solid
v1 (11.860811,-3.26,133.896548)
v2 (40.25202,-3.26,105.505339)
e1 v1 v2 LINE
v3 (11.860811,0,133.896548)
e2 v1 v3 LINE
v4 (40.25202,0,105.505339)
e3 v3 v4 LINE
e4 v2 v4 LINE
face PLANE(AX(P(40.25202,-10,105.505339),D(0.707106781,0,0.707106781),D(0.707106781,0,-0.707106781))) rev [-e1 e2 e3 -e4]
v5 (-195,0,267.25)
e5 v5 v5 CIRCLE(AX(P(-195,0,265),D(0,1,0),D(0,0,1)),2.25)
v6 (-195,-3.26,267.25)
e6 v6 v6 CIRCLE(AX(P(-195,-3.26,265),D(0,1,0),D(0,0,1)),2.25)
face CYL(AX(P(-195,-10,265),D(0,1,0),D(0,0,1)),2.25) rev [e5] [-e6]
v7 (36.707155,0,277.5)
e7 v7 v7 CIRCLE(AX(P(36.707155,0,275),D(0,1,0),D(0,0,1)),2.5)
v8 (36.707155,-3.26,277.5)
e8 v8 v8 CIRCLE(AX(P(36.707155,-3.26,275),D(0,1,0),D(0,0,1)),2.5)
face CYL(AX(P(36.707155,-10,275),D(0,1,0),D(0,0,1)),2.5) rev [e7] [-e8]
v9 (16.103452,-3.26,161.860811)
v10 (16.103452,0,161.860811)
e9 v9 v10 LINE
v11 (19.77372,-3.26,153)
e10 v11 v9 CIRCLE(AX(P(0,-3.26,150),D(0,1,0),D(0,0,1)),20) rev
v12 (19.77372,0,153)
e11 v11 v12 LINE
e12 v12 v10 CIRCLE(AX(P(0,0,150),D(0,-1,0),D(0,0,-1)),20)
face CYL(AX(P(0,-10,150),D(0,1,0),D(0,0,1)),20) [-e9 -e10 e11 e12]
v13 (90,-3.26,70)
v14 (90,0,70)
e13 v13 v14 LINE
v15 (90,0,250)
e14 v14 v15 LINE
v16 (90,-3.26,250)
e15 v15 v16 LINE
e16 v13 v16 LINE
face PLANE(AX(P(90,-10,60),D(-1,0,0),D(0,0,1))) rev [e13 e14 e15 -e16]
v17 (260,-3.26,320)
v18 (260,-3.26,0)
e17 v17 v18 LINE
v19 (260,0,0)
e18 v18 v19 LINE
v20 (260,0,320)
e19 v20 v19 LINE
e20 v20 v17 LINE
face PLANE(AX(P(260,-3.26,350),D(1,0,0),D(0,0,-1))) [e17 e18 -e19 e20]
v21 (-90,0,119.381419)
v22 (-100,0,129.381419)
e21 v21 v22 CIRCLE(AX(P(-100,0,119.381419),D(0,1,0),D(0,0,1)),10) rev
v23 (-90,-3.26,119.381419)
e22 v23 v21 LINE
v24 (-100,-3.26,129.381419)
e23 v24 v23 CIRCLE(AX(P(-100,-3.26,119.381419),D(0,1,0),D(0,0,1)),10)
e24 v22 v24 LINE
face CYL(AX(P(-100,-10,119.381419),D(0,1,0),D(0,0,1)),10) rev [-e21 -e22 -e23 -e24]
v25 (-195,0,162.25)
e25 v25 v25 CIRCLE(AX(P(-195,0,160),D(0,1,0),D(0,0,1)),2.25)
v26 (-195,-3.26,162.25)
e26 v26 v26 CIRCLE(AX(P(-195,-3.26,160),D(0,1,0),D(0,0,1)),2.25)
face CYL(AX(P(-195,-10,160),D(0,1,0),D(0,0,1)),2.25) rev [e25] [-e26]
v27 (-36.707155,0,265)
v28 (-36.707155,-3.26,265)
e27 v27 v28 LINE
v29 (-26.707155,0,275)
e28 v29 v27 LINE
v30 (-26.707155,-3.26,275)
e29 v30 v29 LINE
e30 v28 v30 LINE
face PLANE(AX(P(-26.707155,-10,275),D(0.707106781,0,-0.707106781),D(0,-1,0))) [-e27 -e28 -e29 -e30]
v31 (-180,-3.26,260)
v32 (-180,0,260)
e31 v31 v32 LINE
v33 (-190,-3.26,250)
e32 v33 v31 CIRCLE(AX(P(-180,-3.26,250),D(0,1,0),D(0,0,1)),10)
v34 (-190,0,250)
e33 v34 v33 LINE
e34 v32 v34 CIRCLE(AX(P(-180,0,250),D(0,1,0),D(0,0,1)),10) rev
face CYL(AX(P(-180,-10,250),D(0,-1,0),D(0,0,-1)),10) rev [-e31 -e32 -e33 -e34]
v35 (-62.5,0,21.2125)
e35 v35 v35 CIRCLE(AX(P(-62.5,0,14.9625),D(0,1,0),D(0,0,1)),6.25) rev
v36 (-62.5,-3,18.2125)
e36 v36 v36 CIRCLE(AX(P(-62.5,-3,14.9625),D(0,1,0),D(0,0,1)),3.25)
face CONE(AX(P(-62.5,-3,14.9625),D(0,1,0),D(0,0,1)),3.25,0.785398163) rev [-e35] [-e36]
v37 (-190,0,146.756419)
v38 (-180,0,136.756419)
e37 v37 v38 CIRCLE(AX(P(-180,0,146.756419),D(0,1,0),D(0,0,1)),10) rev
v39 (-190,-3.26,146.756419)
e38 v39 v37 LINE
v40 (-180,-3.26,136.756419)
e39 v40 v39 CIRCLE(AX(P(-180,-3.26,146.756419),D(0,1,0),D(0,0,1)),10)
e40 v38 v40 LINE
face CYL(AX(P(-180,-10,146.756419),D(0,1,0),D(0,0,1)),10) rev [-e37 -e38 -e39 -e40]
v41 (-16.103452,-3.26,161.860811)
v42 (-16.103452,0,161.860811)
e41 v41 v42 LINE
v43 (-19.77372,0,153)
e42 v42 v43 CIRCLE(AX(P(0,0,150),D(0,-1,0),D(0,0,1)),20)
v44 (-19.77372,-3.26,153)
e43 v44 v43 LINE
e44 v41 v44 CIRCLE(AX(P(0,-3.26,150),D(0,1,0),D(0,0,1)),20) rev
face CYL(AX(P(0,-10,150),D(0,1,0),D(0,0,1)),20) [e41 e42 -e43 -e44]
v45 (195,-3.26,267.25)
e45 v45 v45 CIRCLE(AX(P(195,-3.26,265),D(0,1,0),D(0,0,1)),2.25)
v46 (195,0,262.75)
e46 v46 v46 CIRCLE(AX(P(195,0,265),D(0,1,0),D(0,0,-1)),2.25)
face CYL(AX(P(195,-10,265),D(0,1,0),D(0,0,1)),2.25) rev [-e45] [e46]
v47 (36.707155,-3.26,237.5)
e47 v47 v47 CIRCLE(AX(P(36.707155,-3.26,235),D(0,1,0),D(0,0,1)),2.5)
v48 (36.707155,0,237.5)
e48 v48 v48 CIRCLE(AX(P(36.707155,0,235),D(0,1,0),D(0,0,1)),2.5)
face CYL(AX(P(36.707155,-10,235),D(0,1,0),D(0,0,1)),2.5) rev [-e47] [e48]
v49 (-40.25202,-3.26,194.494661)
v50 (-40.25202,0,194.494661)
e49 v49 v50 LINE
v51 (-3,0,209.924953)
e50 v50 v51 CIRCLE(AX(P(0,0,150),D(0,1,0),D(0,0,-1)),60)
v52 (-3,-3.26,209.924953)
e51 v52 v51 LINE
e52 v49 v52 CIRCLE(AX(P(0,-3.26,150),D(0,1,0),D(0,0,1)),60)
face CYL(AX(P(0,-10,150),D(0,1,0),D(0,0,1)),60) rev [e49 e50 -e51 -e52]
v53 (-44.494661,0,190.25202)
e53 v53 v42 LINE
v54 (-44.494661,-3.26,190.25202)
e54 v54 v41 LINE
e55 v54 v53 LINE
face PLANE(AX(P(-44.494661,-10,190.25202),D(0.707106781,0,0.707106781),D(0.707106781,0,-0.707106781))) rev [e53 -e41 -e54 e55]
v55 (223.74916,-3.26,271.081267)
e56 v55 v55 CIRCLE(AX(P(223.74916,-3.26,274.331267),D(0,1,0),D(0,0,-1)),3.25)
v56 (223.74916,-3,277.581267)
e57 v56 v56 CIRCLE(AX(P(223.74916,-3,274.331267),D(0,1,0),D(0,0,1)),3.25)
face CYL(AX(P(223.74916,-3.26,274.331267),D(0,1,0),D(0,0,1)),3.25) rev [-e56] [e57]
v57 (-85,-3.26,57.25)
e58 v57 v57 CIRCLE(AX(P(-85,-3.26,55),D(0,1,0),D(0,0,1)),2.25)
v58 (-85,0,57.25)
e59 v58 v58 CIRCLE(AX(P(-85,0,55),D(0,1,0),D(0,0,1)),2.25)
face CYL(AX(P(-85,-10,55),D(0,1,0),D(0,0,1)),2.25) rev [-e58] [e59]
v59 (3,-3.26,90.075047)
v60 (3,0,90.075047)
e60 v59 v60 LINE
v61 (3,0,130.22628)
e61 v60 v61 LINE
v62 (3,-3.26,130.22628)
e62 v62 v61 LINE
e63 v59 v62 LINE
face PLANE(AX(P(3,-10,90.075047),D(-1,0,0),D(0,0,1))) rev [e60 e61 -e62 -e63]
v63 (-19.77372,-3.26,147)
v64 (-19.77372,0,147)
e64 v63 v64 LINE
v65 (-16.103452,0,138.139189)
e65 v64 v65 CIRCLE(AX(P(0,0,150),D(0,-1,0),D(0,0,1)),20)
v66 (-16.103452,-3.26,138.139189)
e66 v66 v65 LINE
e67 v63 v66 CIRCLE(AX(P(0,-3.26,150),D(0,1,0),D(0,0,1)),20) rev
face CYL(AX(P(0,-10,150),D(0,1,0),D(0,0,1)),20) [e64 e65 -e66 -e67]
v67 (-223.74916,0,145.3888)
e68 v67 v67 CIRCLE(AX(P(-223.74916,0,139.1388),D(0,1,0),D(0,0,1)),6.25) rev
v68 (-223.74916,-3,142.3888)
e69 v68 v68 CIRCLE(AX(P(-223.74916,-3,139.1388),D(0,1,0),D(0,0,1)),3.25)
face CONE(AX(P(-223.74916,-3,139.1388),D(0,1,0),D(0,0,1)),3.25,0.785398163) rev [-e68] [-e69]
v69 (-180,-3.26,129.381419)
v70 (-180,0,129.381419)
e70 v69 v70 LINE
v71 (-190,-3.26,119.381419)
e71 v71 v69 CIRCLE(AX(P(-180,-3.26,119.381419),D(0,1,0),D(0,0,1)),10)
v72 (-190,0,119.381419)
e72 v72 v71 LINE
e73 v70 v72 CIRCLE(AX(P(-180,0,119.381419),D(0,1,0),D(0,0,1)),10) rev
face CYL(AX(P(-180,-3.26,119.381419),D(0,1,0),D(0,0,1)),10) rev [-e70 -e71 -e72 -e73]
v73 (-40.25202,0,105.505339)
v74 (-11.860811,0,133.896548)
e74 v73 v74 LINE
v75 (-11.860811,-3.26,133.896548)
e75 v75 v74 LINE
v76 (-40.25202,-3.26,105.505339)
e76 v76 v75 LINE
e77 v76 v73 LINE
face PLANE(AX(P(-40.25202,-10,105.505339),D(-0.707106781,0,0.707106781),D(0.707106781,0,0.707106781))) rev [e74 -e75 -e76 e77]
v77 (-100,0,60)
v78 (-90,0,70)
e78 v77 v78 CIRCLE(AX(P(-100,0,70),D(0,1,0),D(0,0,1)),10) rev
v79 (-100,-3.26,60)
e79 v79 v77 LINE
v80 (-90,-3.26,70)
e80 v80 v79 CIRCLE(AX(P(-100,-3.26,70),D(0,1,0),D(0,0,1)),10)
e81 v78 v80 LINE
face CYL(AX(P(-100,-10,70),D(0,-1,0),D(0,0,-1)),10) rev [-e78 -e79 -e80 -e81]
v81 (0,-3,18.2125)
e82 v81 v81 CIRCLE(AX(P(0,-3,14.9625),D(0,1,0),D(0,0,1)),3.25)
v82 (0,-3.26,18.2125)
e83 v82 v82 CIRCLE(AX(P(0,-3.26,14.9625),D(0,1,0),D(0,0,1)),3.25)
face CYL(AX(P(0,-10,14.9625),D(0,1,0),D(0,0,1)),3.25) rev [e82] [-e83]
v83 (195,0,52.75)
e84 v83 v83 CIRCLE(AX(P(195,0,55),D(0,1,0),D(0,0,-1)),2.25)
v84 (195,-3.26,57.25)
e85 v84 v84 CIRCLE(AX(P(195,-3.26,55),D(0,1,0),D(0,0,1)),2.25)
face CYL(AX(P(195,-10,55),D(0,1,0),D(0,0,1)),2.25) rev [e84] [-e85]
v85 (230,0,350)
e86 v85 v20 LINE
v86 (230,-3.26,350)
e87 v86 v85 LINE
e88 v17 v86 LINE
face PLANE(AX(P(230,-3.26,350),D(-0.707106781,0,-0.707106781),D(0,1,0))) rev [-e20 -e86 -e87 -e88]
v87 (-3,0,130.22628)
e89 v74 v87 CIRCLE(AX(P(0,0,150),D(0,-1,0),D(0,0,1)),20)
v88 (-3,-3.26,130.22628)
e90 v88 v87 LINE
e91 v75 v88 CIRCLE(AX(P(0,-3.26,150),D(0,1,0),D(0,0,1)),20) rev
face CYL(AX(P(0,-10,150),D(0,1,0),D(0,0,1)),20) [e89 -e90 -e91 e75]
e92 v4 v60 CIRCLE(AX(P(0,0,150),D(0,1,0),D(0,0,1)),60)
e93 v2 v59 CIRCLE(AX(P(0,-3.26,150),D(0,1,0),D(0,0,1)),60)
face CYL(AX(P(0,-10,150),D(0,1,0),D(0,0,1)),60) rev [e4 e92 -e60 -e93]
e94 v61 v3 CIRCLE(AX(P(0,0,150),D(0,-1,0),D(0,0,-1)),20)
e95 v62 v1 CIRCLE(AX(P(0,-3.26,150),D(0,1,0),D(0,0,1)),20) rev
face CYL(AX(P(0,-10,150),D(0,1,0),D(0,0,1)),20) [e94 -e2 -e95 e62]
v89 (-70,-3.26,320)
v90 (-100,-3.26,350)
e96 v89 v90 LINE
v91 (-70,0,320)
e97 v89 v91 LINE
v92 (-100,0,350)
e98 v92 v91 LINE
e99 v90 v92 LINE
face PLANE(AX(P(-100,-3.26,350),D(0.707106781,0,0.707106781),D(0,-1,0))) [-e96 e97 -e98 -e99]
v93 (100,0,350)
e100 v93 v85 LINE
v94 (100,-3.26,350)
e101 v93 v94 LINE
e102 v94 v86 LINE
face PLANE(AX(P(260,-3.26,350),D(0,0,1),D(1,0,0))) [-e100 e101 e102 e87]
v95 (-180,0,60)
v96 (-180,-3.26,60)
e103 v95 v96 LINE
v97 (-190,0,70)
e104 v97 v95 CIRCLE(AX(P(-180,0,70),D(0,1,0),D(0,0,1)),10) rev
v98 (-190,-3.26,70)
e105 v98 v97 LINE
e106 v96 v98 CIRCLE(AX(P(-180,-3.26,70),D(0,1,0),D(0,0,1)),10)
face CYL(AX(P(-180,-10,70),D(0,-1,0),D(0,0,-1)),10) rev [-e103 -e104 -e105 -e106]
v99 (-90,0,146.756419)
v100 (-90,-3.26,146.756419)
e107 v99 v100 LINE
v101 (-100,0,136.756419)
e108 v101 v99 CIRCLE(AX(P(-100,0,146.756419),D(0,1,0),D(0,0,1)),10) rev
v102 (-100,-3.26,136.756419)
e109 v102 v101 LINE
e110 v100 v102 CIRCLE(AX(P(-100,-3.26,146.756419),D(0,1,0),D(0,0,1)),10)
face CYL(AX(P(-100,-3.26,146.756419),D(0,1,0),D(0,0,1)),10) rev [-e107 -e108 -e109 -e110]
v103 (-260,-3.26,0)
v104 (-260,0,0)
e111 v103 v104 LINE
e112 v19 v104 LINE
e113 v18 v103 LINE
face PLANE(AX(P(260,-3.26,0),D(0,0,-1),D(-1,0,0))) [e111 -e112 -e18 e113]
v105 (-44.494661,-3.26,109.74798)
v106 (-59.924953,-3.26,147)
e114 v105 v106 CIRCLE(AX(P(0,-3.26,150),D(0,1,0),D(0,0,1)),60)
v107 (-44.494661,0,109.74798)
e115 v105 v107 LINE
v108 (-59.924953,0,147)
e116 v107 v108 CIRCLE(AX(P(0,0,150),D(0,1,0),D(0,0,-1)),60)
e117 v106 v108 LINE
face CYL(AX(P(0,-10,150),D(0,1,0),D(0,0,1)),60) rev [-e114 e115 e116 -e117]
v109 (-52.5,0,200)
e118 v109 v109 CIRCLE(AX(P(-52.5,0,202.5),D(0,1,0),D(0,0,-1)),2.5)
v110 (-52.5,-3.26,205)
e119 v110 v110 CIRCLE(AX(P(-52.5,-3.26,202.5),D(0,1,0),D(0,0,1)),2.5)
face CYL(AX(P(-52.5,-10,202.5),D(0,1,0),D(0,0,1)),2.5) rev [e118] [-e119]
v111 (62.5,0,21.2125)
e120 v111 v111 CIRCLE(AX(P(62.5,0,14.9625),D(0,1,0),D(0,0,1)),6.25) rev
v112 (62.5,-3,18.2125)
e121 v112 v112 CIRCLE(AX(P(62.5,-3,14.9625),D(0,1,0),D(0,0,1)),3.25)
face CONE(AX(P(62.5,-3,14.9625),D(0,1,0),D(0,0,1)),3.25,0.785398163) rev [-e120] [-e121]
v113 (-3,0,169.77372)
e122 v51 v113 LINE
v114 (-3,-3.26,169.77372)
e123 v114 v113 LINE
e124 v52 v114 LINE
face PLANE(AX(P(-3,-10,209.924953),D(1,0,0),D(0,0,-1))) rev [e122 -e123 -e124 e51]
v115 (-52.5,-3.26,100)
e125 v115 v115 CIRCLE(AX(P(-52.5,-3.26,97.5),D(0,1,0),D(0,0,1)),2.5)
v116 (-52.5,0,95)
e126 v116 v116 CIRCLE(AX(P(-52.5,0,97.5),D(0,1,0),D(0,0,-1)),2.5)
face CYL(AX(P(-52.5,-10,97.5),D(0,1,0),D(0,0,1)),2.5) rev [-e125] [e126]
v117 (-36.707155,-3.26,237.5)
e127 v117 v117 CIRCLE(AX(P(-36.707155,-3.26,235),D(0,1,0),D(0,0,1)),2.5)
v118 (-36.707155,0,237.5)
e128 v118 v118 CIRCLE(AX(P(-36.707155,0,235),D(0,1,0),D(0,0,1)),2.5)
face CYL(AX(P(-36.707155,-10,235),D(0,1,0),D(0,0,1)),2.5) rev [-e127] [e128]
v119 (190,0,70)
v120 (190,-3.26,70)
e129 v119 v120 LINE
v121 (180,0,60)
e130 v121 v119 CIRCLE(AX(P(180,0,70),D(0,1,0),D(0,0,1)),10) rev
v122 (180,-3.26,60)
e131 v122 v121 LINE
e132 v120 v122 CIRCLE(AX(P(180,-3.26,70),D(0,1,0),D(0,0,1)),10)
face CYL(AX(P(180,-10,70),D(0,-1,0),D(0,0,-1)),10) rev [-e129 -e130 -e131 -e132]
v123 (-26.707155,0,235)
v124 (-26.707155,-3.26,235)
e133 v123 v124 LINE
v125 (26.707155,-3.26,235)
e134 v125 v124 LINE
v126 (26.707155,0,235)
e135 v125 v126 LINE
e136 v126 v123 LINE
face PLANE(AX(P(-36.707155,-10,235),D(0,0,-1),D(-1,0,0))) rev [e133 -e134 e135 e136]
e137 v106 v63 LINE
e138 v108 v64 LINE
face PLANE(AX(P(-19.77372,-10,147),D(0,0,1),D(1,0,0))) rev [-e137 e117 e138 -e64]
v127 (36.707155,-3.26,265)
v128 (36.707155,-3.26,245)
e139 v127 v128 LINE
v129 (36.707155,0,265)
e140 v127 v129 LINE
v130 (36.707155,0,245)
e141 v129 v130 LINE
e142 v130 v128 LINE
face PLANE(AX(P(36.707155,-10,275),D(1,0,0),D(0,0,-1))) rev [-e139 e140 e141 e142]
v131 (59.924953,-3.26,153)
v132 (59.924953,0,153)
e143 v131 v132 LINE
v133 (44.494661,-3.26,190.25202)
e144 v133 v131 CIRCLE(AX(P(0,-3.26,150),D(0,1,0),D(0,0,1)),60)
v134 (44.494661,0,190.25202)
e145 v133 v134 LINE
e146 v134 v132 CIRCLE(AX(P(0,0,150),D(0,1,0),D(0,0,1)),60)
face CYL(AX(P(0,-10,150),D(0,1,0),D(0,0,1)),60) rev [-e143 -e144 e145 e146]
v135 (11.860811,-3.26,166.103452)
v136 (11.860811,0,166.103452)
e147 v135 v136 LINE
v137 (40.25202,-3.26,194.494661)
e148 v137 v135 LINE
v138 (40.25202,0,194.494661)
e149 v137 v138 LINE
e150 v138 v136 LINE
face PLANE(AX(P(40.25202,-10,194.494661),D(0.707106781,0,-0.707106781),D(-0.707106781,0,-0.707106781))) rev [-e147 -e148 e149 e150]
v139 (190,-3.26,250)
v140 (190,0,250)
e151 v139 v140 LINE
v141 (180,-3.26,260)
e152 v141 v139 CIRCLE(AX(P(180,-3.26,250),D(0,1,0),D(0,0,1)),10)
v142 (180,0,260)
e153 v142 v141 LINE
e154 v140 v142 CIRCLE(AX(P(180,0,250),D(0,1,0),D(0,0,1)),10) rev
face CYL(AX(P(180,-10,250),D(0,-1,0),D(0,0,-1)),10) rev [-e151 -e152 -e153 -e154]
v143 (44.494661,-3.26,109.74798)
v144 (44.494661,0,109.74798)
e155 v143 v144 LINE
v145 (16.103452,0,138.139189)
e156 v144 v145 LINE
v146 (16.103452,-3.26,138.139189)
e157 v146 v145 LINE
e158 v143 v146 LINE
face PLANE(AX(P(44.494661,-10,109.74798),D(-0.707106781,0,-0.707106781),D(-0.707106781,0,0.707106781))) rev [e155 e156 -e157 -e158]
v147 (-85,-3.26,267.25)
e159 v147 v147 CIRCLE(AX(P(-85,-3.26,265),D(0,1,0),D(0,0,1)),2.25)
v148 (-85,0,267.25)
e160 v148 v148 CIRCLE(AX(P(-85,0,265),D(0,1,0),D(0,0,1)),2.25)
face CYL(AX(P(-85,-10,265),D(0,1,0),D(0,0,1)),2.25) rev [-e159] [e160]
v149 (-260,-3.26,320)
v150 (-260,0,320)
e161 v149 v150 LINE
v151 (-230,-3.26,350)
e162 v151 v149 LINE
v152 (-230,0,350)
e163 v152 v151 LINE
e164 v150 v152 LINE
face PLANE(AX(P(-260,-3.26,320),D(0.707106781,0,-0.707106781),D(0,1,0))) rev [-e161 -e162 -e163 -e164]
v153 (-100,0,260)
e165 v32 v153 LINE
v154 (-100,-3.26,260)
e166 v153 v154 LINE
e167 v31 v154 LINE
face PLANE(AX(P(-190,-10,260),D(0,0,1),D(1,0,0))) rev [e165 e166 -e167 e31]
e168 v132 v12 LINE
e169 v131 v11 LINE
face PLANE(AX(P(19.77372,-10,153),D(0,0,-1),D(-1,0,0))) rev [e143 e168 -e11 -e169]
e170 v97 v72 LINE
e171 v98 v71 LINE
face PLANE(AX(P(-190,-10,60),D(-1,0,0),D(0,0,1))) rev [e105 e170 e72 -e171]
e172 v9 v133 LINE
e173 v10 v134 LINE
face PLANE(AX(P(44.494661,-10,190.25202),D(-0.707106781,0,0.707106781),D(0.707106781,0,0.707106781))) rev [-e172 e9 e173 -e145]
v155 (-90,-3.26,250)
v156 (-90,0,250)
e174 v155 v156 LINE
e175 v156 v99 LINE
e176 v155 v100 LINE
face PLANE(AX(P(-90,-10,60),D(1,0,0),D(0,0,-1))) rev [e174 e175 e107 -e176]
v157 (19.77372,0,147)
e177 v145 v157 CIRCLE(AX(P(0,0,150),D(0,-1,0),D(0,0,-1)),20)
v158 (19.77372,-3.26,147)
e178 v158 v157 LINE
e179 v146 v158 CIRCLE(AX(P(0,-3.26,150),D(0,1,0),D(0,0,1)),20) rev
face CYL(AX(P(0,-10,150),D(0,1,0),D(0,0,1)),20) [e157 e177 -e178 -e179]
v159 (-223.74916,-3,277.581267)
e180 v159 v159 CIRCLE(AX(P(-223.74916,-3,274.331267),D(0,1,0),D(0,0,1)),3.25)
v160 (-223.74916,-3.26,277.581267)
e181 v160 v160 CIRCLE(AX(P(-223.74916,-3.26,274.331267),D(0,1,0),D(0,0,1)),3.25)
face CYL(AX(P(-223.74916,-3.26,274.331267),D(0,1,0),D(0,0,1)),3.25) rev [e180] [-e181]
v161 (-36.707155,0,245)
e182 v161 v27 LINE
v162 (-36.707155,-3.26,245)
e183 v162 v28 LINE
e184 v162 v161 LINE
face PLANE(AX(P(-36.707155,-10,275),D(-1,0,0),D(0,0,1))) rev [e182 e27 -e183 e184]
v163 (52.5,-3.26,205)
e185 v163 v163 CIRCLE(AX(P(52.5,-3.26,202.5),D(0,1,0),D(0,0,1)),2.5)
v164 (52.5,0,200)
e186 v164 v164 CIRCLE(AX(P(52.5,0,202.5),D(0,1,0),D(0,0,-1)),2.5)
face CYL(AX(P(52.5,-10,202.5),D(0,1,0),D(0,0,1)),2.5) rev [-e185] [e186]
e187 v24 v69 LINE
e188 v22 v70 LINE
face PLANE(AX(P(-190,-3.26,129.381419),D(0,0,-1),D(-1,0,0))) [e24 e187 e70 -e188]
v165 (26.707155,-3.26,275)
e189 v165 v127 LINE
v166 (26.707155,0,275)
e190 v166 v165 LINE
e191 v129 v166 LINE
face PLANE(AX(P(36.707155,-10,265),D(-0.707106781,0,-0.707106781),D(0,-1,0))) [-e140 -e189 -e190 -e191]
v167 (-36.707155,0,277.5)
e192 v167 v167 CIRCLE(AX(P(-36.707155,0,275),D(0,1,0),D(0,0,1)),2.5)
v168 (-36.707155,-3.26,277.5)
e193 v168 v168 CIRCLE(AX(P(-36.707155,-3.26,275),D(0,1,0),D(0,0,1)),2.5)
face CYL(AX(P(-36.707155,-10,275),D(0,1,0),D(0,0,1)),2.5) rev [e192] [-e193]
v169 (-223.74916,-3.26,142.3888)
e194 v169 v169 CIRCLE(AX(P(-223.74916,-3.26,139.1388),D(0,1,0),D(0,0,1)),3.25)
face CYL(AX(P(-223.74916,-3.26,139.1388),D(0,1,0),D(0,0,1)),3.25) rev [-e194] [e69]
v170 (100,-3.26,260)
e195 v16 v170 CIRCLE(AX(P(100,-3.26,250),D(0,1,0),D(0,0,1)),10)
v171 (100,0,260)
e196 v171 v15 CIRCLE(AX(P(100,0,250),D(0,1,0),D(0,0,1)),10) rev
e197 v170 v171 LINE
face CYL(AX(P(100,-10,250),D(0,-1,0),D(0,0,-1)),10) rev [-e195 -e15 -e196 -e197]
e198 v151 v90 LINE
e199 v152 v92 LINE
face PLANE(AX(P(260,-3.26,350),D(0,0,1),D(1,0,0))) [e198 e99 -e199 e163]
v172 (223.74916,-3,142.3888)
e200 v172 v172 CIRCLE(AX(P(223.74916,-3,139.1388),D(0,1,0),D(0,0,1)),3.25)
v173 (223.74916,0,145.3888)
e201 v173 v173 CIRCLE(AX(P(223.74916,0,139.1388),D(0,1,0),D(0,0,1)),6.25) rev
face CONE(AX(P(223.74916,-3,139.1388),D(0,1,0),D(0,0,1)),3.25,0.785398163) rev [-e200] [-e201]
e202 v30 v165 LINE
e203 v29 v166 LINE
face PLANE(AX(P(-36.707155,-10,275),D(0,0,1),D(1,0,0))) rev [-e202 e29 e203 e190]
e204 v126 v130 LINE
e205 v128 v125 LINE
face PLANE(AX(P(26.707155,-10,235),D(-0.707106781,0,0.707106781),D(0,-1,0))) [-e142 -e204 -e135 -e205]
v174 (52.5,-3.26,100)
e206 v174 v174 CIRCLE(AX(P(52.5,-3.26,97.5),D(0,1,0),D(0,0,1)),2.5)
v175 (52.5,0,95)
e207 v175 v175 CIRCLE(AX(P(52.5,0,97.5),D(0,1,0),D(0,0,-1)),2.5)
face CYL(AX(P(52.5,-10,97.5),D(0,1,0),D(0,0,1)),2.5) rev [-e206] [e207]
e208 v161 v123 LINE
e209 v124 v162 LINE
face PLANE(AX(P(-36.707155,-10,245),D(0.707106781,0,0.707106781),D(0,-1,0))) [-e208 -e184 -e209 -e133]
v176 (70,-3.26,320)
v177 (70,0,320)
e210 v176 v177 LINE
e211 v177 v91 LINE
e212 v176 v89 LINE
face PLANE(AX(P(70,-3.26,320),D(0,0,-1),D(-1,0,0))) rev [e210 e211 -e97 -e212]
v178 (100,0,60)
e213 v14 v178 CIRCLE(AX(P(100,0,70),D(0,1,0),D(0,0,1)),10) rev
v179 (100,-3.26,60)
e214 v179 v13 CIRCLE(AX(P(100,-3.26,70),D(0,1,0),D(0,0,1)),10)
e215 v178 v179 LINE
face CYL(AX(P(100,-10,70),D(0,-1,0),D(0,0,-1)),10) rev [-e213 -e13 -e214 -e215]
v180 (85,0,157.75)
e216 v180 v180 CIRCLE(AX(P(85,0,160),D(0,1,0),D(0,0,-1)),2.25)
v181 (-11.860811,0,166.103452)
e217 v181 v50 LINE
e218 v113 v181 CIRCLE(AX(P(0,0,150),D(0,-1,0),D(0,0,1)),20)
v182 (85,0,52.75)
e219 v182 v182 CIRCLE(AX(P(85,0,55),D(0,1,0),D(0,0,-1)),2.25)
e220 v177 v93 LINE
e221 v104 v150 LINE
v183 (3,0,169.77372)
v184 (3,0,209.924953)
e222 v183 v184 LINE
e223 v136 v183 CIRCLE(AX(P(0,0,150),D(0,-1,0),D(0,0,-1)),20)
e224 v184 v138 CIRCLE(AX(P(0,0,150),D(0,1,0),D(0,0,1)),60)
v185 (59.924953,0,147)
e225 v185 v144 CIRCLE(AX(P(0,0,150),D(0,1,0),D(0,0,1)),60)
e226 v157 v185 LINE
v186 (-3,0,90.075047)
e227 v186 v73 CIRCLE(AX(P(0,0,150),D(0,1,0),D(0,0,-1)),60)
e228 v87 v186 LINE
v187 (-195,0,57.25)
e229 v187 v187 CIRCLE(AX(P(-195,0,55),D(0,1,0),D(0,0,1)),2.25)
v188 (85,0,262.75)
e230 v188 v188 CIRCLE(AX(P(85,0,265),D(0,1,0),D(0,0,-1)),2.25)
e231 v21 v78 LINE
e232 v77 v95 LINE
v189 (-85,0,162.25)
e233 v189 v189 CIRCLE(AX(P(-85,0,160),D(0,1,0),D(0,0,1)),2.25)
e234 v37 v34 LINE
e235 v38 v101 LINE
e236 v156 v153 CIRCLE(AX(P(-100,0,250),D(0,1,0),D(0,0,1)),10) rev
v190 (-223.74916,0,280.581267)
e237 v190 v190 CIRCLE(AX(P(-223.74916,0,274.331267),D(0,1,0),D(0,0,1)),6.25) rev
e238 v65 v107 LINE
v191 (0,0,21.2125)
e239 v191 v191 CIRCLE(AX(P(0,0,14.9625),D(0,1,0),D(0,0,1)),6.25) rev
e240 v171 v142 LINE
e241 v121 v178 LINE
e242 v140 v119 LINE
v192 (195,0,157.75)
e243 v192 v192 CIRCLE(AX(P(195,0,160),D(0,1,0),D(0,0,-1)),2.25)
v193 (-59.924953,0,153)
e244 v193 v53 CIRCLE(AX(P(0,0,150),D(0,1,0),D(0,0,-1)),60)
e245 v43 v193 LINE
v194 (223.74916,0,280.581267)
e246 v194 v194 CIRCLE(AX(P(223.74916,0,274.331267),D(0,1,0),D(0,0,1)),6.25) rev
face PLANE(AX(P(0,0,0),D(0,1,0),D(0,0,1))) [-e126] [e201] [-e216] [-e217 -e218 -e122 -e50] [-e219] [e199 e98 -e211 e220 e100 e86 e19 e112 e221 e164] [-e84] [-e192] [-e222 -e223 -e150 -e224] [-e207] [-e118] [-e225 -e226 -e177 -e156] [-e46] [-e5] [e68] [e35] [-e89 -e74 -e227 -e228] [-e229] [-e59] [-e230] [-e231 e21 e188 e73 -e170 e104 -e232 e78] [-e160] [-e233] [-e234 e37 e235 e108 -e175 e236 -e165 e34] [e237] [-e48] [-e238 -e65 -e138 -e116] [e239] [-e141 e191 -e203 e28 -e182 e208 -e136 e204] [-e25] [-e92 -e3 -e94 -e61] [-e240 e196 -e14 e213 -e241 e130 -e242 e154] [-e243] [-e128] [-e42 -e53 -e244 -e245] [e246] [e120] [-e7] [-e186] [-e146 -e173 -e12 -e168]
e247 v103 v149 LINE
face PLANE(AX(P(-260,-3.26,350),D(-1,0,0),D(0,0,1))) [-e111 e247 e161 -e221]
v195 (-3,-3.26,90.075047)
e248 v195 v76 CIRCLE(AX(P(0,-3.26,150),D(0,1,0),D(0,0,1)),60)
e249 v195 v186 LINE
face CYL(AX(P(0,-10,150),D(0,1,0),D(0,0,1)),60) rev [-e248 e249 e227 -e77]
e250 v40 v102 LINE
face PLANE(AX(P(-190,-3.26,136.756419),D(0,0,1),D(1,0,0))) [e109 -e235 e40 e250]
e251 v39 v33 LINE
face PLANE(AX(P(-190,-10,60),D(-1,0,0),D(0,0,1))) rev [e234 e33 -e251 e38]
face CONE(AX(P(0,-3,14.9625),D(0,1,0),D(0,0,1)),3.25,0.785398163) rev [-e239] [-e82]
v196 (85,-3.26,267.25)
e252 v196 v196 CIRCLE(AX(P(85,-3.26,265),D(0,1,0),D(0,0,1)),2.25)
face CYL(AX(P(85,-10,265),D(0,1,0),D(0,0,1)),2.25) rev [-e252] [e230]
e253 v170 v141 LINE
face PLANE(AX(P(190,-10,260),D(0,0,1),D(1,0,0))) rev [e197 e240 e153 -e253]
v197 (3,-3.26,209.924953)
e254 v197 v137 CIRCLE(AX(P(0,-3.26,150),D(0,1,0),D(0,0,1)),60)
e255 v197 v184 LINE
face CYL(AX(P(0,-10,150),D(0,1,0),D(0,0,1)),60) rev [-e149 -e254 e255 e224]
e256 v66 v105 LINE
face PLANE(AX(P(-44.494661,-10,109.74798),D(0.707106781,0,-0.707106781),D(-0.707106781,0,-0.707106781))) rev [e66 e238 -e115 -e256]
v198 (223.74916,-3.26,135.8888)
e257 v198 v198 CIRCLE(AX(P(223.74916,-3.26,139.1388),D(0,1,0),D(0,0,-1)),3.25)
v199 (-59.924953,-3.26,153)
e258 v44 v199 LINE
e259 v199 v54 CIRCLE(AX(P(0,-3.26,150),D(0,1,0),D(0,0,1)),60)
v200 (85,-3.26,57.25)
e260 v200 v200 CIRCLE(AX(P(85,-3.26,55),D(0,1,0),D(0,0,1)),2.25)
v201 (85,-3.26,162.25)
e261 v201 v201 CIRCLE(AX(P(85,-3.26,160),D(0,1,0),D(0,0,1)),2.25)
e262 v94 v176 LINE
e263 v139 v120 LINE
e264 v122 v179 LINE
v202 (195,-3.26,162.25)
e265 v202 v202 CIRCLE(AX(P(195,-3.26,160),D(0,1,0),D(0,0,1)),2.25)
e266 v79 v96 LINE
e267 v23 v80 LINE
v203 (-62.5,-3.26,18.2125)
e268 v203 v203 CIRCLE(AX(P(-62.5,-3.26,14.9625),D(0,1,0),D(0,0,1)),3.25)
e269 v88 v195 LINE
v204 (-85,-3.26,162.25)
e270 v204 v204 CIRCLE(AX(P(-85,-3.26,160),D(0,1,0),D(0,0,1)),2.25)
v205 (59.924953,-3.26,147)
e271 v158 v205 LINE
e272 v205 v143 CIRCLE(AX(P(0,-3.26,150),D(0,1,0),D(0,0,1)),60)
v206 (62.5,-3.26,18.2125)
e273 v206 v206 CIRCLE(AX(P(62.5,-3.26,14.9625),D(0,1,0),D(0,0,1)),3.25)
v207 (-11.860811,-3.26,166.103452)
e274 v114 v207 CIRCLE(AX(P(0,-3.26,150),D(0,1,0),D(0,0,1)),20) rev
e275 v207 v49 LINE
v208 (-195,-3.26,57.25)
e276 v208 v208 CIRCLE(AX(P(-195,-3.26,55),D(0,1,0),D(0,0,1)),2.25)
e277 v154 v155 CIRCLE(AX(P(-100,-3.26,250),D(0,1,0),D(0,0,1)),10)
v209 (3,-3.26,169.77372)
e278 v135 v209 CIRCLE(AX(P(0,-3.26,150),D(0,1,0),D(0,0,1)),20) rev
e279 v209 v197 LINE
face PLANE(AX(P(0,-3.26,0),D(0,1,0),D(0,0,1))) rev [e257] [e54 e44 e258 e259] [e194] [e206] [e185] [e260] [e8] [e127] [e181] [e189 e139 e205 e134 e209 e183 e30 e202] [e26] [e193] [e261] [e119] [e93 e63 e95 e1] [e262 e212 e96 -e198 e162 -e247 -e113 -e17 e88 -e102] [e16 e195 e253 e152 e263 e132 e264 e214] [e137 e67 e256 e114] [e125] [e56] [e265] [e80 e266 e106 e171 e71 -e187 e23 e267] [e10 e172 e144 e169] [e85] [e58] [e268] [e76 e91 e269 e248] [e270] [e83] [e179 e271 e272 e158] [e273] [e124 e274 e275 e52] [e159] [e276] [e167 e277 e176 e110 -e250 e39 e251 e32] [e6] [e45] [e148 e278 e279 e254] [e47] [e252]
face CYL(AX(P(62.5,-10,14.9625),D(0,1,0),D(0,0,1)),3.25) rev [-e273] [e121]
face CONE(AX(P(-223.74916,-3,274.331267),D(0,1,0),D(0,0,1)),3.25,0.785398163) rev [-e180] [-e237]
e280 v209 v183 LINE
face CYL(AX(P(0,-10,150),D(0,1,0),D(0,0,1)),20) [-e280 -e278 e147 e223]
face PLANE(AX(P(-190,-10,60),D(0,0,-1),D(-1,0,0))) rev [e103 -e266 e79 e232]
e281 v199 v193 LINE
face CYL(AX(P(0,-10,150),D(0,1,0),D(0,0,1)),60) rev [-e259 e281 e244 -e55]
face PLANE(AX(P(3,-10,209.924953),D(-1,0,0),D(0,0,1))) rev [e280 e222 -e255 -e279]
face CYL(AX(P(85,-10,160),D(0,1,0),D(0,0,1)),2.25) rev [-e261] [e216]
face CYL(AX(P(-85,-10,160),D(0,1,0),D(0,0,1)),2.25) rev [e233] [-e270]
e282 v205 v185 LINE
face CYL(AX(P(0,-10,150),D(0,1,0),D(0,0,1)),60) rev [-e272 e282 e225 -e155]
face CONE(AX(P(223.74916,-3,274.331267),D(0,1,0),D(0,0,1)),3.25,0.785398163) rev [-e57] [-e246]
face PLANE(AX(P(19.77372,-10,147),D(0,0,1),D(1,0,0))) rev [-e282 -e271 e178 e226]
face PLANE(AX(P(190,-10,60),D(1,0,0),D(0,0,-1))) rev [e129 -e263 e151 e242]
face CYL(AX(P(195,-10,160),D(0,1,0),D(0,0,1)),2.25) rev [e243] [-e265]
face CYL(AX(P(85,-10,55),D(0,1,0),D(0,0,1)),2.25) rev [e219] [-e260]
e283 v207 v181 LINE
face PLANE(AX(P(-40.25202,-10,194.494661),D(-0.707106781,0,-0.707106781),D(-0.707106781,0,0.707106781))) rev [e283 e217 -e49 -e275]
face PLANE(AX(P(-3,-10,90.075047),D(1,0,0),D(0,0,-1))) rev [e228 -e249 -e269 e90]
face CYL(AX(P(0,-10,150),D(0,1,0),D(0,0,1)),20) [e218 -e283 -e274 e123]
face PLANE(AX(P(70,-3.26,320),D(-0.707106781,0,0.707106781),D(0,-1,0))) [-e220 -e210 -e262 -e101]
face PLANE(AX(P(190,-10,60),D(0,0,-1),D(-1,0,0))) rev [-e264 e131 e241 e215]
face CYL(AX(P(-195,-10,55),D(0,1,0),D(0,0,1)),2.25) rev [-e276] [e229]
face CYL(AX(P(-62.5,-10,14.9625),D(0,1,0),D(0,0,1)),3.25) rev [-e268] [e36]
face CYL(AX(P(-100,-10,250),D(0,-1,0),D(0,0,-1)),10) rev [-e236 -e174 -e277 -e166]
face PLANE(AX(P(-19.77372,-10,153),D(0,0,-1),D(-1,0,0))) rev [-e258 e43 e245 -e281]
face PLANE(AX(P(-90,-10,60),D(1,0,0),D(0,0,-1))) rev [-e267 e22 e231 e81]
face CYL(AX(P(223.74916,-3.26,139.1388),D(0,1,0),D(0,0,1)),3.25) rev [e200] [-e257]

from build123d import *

# Parameters (mm, degrees)
SKETCH1_W           = 520
SKETCH1_H           = 350
BASE_FLANGE1_DEPTH  = 3.26
SKETCH6_R           = 3.25
CUT_EXTRUDE1_DEPTH  = 10
SKETCH7_R           = 3.25
CUT_EXTRUDE2_DEPTH  = 10
SKETCH9_W           = 140
SKETCH9_H           = 30
CUT_EXTRUDE3_DEPTH  = 6.35
CHAMFER1_SIZE       = 30
SKETCH10_R          = 2.5
CUT_EXTRUDE4_DEPTH  = 10
SKETCH11_R          = 2.25
SKETCH11_W          = 100
SKETCH11_H          = 200
CUT_EXTRUDE5_DEPTH  = 10
SKETCH12_W          = 100
SKETCH12_H          = 7.375
BOSS_EXTRUDE2_DEPTH = 3.26
FILLET1_R           = 10
SKETCH13_W          = 73.414309182
SKETCH13_H          = 40
CUT_EXTRUDE6_DEPTH  = 10
CHAMFER2_SIZE       = 10
SKETCH14_R          = 2.5
CUT_EXTRUDE7_DEPTH  = 10
CHAMFER3_SIZE       = 3


# Sheet-metal steps are written as plain solids
with BuildPart() as part:
    # Sketch1 → Base-Flange1 (new body)
    with BuildSketch(Plane(origin=(0, 0, 0), x_dir=(1, 0, 0), z_dir=(0, 1, 0))):
        with Locations((0, -175)):
            Rectangle(SKETCH1_W, SKETCH1_H)
    extrude(amount=-BASE_FLANGE1_DEPTH)

    # Sketch6 → Cut-Extrude1 (cut)
    with BuildSketch(Plane(origin=(0, 0, 0), x_dir=(1, 0, 0), z_dir=(0, 1, 0))):
        with Locations(Location((62.5, -14.9625, 0), (0, 0, 270))):
            Circle(SKETCH6_R)
        with Locations(Location((0, -14.9625, 0), (0, 0, 270))):
            Circle(SKETCH6_R)
        with Locations(Location((-62.5, -14.9625, 0), (0, 0, 270))):
            Circle(SKETCH6_R)
    extrude(amount=-CUT_EXTRUDE1_DEPTH, mode=Mode.SUBTRACT)

    # Sketch7 → Cut-Extrude2 (cut)
    with BuildSketch(Plane(origin=(0, 0, 0), x_dir=(1, 0, 0), z_dir=(0, 1, 0))):
        with Locations(Location((-223.749160028, -139.138800169, 0), (0, 0, 270))):
            Circle(SKETCH7_R)
        with Locations(Location((-223.749160028, -274.331266718, 0), (0, 0, 270))):
            Circle(SKETCH7_R)
        with Locations(Location((223.749160028, -274.331266718, 0), (0, 0, 90))):
            Circle(SKETCH7_R)
        with Locations(Location((223.749160028, -139.138800169, 0), (0, 0, 90))):
            Circle(SKETCH7_R)
    extrude(amount=-CUT_EXTRUDE2_DEPTH, mode=Mode.SUBTRACT)

    # Sketch9 → Cut-Extrude3 (cut)
    with BuildSketch(Plane(origin=(0, 0, 0), x_dir=(1, 0, 0), z_dir=(0, 1, 0))):
        with Locations((0, -335)):
            Rectangle(SKETCH9_W, SKETCH9_H)
    extrude(amount=-CUT_EXTRUDE3_DEPTH, mode=Mode.SUBTRACT)

    # Chamfer1
    chamfer1_edges = [part.edges().sort_by_distance(p)[0] for p in [
        (260, -1.63, 350),
        (-260, -1.63, 350),
        (70, -1.63, 350),
        (-70, -1.63, 350),
    ]]
    chamfer(chamfer1_edges, length=CHAMFER1_SIZE - 0.0001)  # a hair under: the kernel refuses the full size

    # Sketch10 → Cut-Extrude4 (cut)
    with BuildSketch(Plane(origin=(0, 0, 0), x_dir=(1, 0, 0), z_dir=(0, 1, 0))):
        with Locations(Location((-52.5, -97.5, 0), (0, 0, 270))):
            Circle(SKETCH10_R)
        with Locations(Location((52.5, -97.5, 0), (0, 0, 270))):
            Circle(SKETCH10_R)
        with Locations(Location((52.5, -202.5, 0), (0, 0, 270))):
            Circle(SKETCH10_R)
        with Locations(Location((-52.5, -202.5, 0), (0, 0, 270))):
            Circle(SKETCH10_R)
        with BuildLine():
            Line((-3, -209.924953066), (-3, -169.773719933))
            ThreePointArc((-3, -169.773719933), (-7.653668647, -168.47759065), (-11.860811111, -166.103451798))
            Line((-11.860811111, -166.103451798), (-40.252020332, -194.494661019))
            ThreePointArc((-40.252020332, -194.494661019), (-22.961005942, -205.432771951), (-3, -209.924953066))
        make_face()
        with BuildLine():
            Line((-3, -90.075046934), (-3, -130.226280067))
            ThreePointArc((-3, -130.226280067), (-7.653668647, -131.52240935), (-11.860811111, -133.896548202))
            Line((-11.860811111, -133.896548202), (-40.252020332, -105.505338981))
            ThreePointArc((-40.252020332, -105.505338981), (-22.961005942, -94.567228049), (-3, -90.075046934))
        make_face()
        with BuildLine():
            Line((-19.773719933, -147), (-59.924953066, -147))
            ThreePointArc((-59.924953066, -147), (-55.432771951, -127.038994058), (-44.494661019, -109.747979668))
            Line((-44.494661019, -109.747979668), (-16.103451798, -138.139188889))
            ThreePointArc((-16.103451798, -138.139188889), (-18.47759065, -142.346331353), (-19.773719933, -147))
        make_face()
        with BuildLine():
            Line((-19.773719933, -153), (-59.924953066, -153))
            ThreePointArc((-59.924953066, -153), (-55.432771951, -172.961005942), (-44.494661019, -190.252020332))
            Line((-44.494661019, -190.252020332), (-16.103451798, -161.860811111))
            ThreePointArc((-16.103451798, -161.860811111), (-18.47759065, -157.653668647), (-19.773719933, -153))
        make_face()
        with BuildLine():
            Line((3, -209.924953066), (3, -169.773719933))
            ThreePointArc((3, -169.773719933), (7.653668647, -168.47759065), (11.860811111, -166.103451798))
            Line((11.860811111, -166.103451798), (40.252020332, -194.494661019))
            ThreePointArc((40.252020332, -194.494661019), (22.961005942, -205.432771951), (3, -209.924953066))
        make_face()
        with BuildLine():
            Line((44.494661019, -190.252020332), (16.103451798, -161.860811111))
            ThreePointArc((16.103451798, -161.860811111), (18.47759065, -157.653668647), (19.773719933, -153))
            Line((19.773719933, -153), (59.924953066, -153))
            ThreePointArc((59.924953066, -153), (55.432771951, -172.961005942), (44.494661019, -190.252020332))
        make_face()
        with BuildLine():
            Line((19.773719933, -147), (59.924953066, -147))
            ThreePointArc((59.924953066, -147), (55.432771951, -127.038994058), (44.494661019, -109.747979668))
            Line((44.494661019, -109.747979668), (16.103451798, -138.139188889))
            ThreePointArc((16.103451798, -138.139188889), (18.47759065, -142.346331353), (19.773719933, -147))
        make_face()
        with BuildLine():
            Line((40.252020332, -105.505338981), (11.860811111, -133.896548202))
            ThreePointArc((11.860811111, -133.896548202), (7.653668647, -131.52240935), (3, -130.226280067))
            Line((3, -130.226280067), (3, -90.075046934))
            ThreePointArc((3, -90.075046934), (22.961005942, -94.567228049), (40.252020332, -105.505338981))
        make_face()
    extrude(amount=-CUT_EXTRUDE4_DEPTH, mode=Mode.SUBTRACT)

    # Sketch11 → Cut-Extrude5 (cut)
    with BuildSketch(Plane(origin=(0, 0, 0), x_dir=(1, 0, 0), z_dir=(0, 1, 0))):
        with Locations(Location((-195, -265, 0), (0, 0, 270))):
            Circle(SKETCH11_R)
        with Locations(Location((-195, -55, 0), (0, 0, 270))):
            Circle(SKETCH11_R)
        with Locations(Location((-85, -55, 0), (0, 0, 270))):
            Circle(SKETCH11_R)
        with Locations(Location((-85, -265, 0), (0, 0, 270))):
            Circle(SKETCH11_R)
        with Locations(Location((-85, -160, 0), (0, 0, 270))):
            Circle(SKETCH11_R)
        with Locations(Location((-195, -160, 0), (0, 0, 270))):
            Circle(SKETCH11_R)
        with Locations(Location((195, -160, 0), (0, 0, 270))):
            Circle(SKETCH11_R)
        with Locations(Location((85, -160, 0), (0, 0, 270))):
            Circle(SKETCH11_R)
        with Locations(Location((85, -265, 0), (0, 0, 270))):
            Circle(SKETCH11_R)
        with Locations(Location((85, -55, 0), (0, 0, 270))):
            Circle(SKETCH11_R)
        with Locations(Location((195, -55, 0), (0, 0, 270))):
            Circle(SKETCH11_R)
        with Locations(Location((195, -265, 0), (0, 0, 270))):
            Circle(SKETCH11_R)
        with Locations((-140, -160)):
            Rectangle(SKETCH11_W, SKETCH11_H)
        with Locations((140, -160)):
            Rectangle(SKETCH11_W, SKETCH11_H)
    extrude(amount=-CUT_EXTRUDE5_DEPTH, mode=Mode.SUBTRACT)

    # Sketch12 → Boss-Extrude2 (add)
    with BuildSketch(Plane(origin=(0, 0, 0), x_dir=(1, 0, 0), z_dir=(0, 1, 0))):
        with Locations((-140, -133.068919425)):
            Rectangle(SKETCH12_W, SKETCH12_H)
    extrude(amount=-BOSS_EXTRUDE2_DEPTH)

    # Fillet1
    fillet1_edges = [part.edges().sort_by_distance(p)[0] for p in [
        (-90, -1.63, 60),
        (-90, -1.63, 260),
        (-190, -1.63, 260),
        (-190, -1.63, 60),
        (190, -1.63, 60),
        (190, -1.63, 260),
        (90, -1.63, 260),
        (90, -1.63, 60),
        (-190, -1.63, 136.756419425),
        (-190, -1.63, 129.381419425),
        (-90, -1.63, 129.381419425),
        (-90, -1.63, 136.756419425),
    ]]
    fillet(fillet1_edges, radius=FILLET1_R)

    # Sketch13 → Cut-Extrude6 (cut)
    with BuildSketch(Plane(origin=(0, 0, 0), x_dir=(1, 0, 0), z_dir=(0, 1, 0))):
        with Locations((0, -255)):
            Rectangle(SKETCH13_W, SKETCH13_H)
    extrude(amount=-CUT_EXTRUDE6_DEPTH, mode=Mode.SUBTRACT)

    # Chamfer2
    chamfer2_edges = [part.edges().sort_by_distance(p)[0] for p in [
        (36.707154591, -1.63, 235),
        (36.707154591, -1.63, 275),
        (-36.707154591, -1.63, 275),
        (-36.707154591, -1.63, 235),
    ]]
    chamfer(chamfer2_edges, length=CHAMFER2_SIZE)

    # Sketch14 → Cut-Extrude7 (cut)
    with BuildSketch(Plane(origin=(0, 0, 0), x_dir=(1, 0, 0), z_dir=(0, 1, 0))):
        with Locations(Location((-36.707154591, -275, 0), (0, 0, 270))):
            Circle(SKETCH14_R)
        with Locations(Location((-36.707154591, -235, 0), (0, 0, 270))):
            Circle(SKETCH14_R)
        with Locations(Location((36.707154591, -235, 0), (0, 0, 270))):
            Circle(SKETCH14_R)
        with Locations(Location((36.707154591, -275, 0), (0, 0, 270))):
            Circle(SKETCH14_R)
    extrude(amount=-CUT_EXTRUDE7_DEPTH, mode=Mode.SUBTRACT)

    # Chamfer3
    chamfer3_edges = [part.edges().sort_by_distance(p)[0] for p in [
        (62.5, 0, 11.7125),
        (0, 0, 11.7125),
        (-62.5, 0, 11.7125),
        (-223.749160028, 0, 135.888800169),
        (-223.749160028, 0, 271.081266718),
        (223.749160028, 0, 277.581266718),
        (223.749160028, 0, 142.388800169),
    ]]
    chamfer(chamfer3_edges, length=CHAMFER3_SIZE)


solid = part.part
